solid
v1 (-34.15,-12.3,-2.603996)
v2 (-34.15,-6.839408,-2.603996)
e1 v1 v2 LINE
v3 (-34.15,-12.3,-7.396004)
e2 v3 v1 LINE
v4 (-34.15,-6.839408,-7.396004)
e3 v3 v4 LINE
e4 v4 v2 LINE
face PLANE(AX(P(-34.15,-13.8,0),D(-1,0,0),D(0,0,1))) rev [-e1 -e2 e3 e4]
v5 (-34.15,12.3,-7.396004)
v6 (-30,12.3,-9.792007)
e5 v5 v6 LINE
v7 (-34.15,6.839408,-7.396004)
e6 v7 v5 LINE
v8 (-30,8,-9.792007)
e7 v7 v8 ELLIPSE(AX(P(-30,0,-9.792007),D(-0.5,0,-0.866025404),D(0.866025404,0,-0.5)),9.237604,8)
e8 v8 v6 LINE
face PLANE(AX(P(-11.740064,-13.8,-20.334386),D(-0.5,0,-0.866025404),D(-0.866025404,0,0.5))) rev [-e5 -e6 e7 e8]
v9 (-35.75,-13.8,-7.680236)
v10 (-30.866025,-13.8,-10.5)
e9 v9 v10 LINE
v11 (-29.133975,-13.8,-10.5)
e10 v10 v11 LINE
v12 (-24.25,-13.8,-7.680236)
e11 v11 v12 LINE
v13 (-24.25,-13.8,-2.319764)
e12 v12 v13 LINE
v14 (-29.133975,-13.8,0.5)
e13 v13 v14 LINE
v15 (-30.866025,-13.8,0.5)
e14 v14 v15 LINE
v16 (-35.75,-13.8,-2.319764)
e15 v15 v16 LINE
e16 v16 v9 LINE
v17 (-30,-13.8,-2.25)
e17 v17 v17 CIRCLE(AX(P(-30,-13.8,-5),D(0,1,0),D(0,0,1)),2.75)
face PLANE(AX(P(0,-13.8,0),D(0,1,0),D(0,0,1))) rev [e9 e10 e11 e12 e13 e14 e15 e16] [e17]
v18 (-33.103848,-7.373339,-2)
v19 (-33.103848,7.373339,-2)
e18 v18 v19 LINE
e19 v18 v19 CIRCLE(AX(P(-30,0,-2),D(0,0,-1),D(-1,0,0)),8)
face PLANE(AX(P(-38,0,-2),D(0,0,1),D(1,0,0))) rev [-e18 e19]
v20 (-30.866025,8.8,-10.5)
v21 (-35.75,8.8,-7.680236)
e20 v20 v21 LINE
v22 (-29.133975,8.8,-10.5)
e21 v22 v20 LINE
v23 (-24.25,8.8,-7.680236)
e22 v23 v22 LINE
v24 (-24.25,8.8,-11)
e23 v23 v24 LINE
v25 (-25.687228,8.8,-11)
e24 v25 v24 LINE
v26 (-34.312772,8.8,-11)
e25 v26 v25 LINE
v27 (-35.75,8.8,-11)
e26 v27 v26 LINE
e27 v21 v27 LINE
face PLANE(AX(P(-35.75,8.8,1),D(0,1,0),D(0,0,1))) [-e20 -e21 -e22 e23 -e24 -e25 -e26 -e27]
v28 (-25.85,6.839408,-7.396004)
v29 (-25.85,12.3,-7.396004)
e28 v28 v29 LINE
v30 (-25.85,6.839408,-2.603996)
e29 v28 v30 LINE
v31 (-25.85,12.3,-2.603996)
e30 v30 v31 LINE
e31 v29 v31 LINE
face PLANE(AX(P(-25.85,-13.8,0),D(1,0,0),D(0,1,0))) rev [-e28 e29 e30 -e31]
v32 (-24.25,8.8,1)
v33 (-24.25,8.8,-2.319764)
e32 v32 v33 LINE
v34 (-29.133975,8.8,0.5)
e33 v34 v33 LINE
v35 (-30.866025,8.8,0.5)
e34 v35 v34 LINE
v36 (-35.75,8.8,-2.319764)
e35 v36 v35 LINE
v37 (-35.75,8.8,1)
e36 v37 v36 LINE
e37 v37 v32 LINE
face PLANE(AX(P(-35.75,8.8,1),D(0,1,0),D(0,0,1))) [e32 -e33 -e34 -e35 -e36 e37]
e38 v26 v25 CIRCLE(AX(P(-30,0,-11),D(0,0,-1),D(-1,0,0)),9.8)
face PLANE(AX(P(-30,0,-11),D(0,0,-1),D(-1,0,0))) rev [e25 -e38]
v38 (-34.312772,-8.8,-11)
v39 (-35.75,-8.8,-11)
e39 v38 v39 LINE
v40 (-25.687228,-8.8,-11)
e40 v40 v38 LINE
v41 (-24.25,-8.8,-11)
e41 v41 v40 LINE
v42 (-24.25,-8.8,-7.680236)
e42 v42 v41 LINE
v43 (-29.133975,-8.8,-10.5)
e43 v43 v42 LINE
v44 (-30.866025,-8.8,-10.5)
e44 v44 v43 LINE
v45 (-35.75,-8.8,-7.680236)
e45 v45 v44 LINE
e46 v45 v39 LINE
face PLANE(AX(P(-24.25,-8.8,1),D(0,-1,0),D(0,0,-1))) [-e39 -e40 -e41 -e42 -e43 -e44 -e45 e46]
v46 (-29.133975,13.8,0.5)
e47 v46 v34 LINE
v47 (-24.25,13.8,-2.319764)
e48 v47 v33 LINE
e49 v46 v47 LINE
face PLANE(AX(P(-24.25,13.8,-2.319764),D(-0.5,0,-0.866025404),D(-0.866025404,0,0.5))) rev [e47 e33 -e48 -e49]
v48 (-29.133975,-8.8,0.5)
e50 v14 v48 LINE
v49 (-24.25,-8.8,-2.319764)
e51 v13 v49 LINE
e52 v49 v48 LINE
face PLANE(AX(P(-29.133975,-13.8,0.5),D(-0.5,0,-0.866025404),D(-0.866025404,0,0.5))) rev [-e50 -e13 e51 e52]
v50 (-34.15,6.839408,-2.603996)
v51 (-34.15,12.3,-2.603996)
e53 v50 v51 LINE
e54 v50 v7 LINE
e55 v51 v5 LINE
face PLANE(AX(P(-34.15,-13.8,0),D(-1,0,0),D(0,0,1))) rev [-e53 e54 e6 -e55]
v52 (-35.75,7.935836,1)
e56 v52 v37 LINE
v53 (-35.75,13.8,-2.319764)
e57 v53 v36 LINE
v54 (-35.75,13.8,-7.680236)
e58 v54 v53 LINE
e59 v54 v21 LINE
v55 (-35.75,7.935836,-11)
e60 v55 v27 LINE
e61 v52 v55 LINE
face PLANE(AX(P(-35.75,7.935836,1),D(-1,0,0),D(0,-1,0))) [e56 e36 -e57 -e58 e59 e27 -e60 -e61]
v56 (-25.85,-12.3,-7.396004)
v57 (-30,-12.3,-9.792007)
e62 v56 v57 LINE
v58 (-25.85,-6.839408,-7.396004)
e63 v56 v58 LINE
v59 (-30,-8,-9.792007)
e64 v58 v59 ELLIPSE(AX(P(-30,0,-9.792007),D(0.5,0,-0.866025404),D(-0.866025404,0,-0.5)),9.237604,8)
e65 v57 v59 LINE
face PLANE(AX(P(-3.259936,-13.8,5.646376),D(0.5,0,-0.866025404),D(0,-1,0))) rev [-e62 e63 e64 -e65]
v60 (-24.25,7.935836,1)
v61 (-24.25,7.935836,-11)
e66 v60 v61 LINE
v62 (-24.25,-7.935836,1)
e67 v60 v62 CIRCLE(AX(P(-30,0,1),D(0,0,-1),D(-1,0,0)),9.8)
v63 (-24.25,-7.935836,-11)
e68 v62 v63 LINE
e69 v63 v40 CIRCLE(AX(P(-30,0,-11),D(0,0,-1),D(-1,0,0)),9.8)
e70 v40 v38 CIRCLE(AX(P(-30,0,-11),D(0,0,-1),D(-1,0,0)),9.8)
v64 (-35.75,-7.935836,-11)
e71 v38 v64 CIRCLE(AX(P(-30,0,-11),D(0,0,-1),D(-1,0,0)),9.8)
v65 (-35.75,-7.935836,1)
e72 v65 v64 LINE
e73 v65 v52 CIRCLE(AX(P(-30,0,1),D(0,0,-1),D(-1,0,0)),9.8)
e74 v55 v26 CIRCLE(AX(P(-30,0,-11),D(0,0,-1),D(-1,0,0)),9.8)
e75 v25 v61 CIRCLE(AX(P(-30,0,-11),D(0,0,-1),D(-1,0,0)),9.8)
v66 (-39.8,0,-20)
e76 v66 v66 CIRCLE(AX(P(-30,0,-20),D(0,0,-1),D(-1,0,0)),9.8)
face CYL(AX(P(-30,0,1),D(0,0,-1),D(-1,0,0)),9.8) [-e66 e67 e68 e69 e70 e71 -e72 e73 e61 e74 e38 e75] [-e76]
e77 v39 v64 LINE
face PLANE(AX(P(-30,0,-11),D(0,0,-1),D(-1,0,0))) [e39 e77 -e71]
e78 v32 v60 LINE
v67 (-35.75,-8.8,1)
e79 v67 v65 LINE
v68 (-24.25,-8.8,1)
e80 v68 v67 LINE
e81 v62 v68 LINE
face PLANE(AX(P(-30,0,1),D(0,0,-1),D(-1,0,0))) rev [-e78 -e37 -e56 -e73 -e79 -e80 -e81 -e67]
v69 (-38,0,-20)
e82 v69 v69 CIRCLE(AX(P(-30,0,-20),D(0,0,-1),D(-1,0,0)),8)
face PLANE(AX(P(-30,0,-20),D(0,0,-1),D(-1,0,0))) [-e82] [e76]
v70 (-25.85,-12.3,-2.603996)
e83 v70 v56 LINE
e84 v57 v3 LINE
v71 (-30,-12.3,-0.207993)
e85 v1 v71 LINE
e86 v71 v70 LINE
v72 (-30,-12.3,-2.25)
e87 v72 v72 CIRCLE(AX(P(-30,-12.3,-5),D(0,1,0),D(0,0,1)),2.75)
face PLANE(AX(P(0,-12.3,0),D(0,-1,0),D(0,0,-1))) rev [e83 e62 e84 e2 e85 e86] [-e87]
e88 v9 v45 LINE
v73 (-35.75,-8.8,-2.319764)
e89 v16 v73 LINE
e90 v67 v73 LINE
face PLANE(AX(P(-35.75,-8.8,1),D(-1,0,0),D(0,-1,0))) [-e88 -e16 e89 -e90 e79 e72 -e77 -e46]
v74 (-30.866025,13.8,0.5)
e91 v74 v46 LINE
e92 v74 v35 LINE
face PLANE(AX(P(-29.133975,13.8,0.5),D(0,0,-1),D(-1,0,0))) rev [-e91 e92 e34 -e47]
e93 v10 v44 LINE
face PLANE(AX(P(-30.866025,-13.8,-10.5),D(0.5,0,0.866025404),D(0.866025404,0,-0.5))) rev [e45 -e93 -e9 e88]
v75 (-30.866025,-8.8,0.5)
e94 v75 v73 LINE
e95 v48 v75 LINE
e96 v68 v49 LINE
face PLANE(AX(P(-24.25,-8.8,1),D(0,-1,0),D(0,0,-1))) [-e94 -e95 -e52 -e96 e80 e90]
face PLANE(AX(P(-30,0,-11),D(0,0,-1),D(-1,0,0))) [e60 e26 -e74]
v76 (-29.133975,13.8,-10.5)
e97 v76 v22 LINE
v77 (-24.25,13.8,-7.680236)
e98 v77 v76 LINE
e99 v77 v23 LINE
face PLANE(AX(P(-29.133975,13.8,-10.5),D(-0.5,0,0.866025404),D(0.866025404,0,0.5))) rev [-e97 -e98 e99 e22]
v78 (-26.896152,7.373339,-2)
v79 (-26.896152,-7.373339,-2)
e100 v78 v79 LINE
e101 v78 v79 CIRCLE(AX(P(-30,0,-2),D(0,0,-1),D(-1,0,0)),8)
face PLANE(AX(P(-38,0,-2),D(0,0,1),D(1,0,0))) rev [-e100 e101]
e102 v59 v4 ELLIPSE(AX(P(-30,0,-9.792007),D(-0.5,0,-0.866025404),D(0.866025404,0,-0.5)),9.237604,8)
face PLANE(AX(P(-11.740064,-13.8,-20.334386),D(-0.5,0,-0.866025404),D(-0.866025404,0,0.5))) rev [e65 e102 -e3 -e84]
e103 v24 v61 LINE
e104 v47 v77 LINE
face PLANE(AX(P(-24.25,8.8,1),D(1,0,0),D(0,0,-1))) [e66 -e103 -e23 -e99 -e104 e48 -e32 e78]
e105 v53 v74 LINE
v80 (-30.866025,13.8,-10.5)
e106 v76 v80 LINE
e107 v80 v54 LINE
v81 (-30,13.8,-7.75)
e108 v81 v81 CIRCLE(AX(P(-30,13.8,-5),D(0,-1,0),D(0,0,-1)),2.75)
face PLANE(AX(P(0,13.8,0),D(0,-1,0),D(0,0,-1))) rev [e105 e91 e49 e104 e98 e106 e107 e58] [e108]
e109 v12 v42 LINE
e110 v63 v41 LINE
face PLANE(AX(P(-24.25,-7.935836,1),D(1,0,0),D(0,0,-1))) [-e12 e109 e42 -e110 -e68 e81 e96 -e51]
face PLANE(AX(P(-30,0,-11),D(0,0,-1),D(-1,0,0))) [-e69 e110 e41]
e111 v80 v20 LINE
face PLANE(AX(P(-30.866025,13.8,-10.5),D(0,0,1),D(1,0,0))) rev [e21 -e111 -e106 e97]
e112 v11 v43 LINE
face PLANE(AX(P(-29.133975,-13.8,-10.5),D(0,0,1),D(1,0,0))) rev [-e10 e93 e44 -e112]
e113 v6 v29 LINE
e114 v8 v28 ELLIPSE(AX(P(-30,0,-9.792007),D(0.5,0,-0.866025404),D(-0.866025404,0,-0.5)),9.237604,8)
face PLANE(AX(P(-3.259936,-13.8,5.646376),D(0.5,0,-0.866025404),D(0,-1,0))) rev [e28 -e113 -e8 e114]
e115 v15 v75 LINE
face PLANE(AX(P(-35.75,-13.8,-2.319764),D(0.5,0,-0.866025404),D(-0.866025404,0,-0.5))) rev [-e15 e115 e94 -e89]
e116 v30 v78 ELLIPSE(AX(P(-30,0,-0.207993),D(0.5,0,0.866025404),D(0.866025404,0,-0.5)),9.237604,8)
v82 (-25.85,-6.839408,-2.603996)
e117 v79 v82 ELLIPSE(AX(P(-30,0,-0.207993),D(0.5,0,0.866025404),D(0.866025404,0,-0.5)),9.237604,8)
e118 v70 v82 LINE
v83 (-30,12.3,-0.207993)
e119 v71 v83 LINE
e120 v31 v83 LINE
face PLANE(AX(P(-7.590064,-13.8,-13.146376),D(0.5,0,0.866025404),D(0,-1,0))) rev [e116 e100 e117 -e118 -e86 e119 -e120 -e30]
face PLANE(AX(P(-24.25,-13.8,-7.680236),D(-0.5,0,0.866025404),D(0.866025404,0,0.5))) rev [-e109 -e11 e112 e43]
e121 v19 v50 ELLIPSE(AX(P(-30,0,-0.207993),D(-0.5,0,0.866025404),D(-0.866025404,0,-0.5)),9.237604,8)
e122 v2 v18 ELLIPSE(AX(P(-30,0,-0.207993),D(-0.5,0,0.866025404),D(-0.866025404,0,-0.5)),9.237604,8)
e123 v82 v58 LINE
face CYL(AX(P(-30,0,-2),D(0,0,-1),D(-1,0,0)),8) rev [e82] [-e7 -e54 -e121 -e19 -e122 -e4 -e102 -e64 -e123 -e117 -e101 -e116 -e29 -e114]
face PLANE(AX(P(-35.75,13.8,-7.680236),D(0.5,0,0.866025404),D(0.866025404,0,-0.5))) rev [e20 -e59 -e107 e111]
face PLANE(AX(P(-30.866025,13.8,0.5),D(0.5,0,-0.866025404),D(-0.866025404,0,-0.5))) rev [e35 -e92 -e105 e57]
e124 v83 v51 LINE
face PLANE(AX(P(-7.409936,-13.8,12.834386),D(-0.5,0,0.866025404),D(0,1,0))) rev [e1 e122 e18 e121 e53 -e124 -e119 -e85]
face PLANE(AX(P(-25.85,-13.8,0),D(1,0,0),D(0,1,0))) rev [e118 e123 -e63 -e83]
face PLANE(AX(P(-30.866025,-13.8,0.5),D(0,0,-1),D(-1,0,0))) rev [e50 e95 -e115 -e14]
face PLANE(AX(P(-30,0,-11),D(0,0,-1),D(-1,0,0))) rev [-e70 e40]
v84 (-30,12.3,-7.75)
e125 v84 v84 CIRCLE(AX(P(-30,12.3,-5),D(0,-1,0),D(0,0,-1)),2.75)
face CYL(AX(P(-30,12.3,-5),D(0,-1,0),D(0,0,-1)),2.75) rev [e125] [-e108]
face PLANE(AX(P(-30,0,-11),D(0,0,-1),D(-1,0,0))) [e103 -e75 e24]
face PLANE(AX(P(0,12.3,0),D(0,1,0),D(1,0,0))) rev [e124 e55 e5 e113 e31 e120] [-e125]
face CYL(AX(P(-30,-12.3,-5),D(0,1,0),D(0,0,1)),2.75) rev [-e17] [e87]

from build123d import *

# Parameters (mm, degrees)
BOSS_EXTRUDE1_DEPTH            = 12
BOSS_EXTRUDE2_DEPTH            = 5
BOSS_EXTRUDE3_DEPTH            = 5
BOSS_EXTRUDE4_START            = 9
SKETCH4_R                      = 9.8
BOSS_EXTRUDE4_DEPTH            = 9
CUT_THICKEN1_START             = -12.3
CUT_THICKEN1_DEPTH             = 24.6
SKETCH5_W                      = 8
SKETCH5_H                      = 18
F_5_5_5_5_DIAMETER_HOLE1_D     = 5.5
F_5_5_5_5_DIAMETER_HOLE1_DEPTH = 1.5
F_5_5_5_5_DIAMETER_HOLE2_D     = 5.5


# Read off the part's stored shape, not the designer's step: Cut-Thicken1
with BuildPart() as part:
    # Sketch1 → Boss-Extrude1 (new body)
    with BuildSketch(Plane(origin=(0, 0, -11), x_dir=(-1, 0, 0), z_dir=(0, 0, -1))):
        with BuildLine():
            Line((24.25, -7.93583644), (24.25, -8.8))
            Line((24.25, -8.8), (35.75, -8.8))
            Line((35.75, -8.8), (35.75, -7.93583644))
            ThreePointArc((35.75, -7.93583644), (39.8, 0), (35.75, 7.93583644))
            Line((35.75, 7.93583644), (35.75, 8.8))
            Line((35.75, 8.8), (24.25, 8.8))
            Line((24.25, 8.8), (24.25, 7.93583644))
            ThreePointArc((24.25, 7.93583644), (20.2, 0), (24.25, -7.93583644))
        make_face()
    extrude(amount=-BOSS_EXTRUDE1_DEPTH)

    # Sketch2 → Boss-Extrude2 (add)
    with BuildSketch(Plane(origin=(0, 8.8, 0), x_dir=(-1, 0, 0), z_dir=(0, 1, 0))):
        Polygon((29.133974596, 0.5), (30.866025404, 0.5), (35.75, -2.319764048), (35.75, -7.680235952), (30.866025404, -10.5), (29.133974596, -10.5), (24.25, -7.680235952), (24.25, -2.319764048), align=None)
    extrude(amount=BOSS_EXTRUDE2_DEPTH)

    # Sketch3 → Boss-Extrude3 (add)
    with BuildSketch(Plane.XZ.offset(8.8)):
        Polygon((-35.75, -2.319764048), (-30.866025404, 0.5), (-29.133974596, 0.5), (-24.25, -2.319764048), (-24.25, -7.680235952), (-29.133974596, -10.5), (-30.866025404, -10.5), (-35.75, -7.680235952), align=None)
    extrude(amount=BOSS_EXTRUDE3_DEPTH)

    # Sketch4 → Boss-Extrude4 (add)
    with BuildSketch(Plane(origin=(0, 0, -11), x_dir=(-1, 0, 0), z_dir=(0, 0, -1)).offset(BOSS_EXTRUDE4_START)):
        with Locations((30, 0)):
            Circle(SKETCH4_R)
    extrude(amount=-BOSS_EXTRUDE4_DEPTH)

    # Cut-Thicken1 outline → Cut-Thicken1 (cut)
    with BuildSketch(Plane(origin=(0, 0, 0), x_dir=(1, 0, 0), z_dir=(0, 1, 0)).offset(CUT_THICKEN1_START)):
        Polygon((-30, 9.792007234), (-34.15, 7.396003617), (-34.15, 2.603996383), (-30, 0.207992766), (-25.85, 2.603996383), (-25.85, 7.396003617), align=None)
    extrude(amount=CUT_THICKEN1_DEPTH, mode=Mode.SUBTRACT)

    # Sketch5 → Cut-Revolve1 (revolve, cut)
    with BuildSketch(Plane(origin=(0, 0, 0), x_dir=(1, 0, 0), z_dir=(0, 1, 0))):
        with Locations((-34, 11)):
            Rectangle(SKETCH5_W, SKETCH5_H)
    revolve(axis=Axis((-30, 0, -2), (0, 0, -1)), mode=Mode.SUBTRACT)

    # Ø5.5 (5.5) Diameter Hole1
    with Locations(Plane(origin=(0, 12.3, 0), x_dir=(-1, 0, 0), z_dir=(0, -1, 0))):
        with Locations((30, 5)):
            Hole(F_5_5_5_5_DIAMETER_HOLE1_D / 2, depth=F_5_5_5_5_DIAMETER_HOLE1_DEPTH)

    # Ø5.5 (5.5) Diameter Hole2 (through all)
    with Locations(Plane(origin=(0, -12.3, 0), x_dir=(1, 0, 0), z_dir=(0, 1, 0))):
        with Locations((-30, 5)):
            Hole(F_5_5_5_5_DIAMETER_HOLE2_D / 2)


solid = part.part
